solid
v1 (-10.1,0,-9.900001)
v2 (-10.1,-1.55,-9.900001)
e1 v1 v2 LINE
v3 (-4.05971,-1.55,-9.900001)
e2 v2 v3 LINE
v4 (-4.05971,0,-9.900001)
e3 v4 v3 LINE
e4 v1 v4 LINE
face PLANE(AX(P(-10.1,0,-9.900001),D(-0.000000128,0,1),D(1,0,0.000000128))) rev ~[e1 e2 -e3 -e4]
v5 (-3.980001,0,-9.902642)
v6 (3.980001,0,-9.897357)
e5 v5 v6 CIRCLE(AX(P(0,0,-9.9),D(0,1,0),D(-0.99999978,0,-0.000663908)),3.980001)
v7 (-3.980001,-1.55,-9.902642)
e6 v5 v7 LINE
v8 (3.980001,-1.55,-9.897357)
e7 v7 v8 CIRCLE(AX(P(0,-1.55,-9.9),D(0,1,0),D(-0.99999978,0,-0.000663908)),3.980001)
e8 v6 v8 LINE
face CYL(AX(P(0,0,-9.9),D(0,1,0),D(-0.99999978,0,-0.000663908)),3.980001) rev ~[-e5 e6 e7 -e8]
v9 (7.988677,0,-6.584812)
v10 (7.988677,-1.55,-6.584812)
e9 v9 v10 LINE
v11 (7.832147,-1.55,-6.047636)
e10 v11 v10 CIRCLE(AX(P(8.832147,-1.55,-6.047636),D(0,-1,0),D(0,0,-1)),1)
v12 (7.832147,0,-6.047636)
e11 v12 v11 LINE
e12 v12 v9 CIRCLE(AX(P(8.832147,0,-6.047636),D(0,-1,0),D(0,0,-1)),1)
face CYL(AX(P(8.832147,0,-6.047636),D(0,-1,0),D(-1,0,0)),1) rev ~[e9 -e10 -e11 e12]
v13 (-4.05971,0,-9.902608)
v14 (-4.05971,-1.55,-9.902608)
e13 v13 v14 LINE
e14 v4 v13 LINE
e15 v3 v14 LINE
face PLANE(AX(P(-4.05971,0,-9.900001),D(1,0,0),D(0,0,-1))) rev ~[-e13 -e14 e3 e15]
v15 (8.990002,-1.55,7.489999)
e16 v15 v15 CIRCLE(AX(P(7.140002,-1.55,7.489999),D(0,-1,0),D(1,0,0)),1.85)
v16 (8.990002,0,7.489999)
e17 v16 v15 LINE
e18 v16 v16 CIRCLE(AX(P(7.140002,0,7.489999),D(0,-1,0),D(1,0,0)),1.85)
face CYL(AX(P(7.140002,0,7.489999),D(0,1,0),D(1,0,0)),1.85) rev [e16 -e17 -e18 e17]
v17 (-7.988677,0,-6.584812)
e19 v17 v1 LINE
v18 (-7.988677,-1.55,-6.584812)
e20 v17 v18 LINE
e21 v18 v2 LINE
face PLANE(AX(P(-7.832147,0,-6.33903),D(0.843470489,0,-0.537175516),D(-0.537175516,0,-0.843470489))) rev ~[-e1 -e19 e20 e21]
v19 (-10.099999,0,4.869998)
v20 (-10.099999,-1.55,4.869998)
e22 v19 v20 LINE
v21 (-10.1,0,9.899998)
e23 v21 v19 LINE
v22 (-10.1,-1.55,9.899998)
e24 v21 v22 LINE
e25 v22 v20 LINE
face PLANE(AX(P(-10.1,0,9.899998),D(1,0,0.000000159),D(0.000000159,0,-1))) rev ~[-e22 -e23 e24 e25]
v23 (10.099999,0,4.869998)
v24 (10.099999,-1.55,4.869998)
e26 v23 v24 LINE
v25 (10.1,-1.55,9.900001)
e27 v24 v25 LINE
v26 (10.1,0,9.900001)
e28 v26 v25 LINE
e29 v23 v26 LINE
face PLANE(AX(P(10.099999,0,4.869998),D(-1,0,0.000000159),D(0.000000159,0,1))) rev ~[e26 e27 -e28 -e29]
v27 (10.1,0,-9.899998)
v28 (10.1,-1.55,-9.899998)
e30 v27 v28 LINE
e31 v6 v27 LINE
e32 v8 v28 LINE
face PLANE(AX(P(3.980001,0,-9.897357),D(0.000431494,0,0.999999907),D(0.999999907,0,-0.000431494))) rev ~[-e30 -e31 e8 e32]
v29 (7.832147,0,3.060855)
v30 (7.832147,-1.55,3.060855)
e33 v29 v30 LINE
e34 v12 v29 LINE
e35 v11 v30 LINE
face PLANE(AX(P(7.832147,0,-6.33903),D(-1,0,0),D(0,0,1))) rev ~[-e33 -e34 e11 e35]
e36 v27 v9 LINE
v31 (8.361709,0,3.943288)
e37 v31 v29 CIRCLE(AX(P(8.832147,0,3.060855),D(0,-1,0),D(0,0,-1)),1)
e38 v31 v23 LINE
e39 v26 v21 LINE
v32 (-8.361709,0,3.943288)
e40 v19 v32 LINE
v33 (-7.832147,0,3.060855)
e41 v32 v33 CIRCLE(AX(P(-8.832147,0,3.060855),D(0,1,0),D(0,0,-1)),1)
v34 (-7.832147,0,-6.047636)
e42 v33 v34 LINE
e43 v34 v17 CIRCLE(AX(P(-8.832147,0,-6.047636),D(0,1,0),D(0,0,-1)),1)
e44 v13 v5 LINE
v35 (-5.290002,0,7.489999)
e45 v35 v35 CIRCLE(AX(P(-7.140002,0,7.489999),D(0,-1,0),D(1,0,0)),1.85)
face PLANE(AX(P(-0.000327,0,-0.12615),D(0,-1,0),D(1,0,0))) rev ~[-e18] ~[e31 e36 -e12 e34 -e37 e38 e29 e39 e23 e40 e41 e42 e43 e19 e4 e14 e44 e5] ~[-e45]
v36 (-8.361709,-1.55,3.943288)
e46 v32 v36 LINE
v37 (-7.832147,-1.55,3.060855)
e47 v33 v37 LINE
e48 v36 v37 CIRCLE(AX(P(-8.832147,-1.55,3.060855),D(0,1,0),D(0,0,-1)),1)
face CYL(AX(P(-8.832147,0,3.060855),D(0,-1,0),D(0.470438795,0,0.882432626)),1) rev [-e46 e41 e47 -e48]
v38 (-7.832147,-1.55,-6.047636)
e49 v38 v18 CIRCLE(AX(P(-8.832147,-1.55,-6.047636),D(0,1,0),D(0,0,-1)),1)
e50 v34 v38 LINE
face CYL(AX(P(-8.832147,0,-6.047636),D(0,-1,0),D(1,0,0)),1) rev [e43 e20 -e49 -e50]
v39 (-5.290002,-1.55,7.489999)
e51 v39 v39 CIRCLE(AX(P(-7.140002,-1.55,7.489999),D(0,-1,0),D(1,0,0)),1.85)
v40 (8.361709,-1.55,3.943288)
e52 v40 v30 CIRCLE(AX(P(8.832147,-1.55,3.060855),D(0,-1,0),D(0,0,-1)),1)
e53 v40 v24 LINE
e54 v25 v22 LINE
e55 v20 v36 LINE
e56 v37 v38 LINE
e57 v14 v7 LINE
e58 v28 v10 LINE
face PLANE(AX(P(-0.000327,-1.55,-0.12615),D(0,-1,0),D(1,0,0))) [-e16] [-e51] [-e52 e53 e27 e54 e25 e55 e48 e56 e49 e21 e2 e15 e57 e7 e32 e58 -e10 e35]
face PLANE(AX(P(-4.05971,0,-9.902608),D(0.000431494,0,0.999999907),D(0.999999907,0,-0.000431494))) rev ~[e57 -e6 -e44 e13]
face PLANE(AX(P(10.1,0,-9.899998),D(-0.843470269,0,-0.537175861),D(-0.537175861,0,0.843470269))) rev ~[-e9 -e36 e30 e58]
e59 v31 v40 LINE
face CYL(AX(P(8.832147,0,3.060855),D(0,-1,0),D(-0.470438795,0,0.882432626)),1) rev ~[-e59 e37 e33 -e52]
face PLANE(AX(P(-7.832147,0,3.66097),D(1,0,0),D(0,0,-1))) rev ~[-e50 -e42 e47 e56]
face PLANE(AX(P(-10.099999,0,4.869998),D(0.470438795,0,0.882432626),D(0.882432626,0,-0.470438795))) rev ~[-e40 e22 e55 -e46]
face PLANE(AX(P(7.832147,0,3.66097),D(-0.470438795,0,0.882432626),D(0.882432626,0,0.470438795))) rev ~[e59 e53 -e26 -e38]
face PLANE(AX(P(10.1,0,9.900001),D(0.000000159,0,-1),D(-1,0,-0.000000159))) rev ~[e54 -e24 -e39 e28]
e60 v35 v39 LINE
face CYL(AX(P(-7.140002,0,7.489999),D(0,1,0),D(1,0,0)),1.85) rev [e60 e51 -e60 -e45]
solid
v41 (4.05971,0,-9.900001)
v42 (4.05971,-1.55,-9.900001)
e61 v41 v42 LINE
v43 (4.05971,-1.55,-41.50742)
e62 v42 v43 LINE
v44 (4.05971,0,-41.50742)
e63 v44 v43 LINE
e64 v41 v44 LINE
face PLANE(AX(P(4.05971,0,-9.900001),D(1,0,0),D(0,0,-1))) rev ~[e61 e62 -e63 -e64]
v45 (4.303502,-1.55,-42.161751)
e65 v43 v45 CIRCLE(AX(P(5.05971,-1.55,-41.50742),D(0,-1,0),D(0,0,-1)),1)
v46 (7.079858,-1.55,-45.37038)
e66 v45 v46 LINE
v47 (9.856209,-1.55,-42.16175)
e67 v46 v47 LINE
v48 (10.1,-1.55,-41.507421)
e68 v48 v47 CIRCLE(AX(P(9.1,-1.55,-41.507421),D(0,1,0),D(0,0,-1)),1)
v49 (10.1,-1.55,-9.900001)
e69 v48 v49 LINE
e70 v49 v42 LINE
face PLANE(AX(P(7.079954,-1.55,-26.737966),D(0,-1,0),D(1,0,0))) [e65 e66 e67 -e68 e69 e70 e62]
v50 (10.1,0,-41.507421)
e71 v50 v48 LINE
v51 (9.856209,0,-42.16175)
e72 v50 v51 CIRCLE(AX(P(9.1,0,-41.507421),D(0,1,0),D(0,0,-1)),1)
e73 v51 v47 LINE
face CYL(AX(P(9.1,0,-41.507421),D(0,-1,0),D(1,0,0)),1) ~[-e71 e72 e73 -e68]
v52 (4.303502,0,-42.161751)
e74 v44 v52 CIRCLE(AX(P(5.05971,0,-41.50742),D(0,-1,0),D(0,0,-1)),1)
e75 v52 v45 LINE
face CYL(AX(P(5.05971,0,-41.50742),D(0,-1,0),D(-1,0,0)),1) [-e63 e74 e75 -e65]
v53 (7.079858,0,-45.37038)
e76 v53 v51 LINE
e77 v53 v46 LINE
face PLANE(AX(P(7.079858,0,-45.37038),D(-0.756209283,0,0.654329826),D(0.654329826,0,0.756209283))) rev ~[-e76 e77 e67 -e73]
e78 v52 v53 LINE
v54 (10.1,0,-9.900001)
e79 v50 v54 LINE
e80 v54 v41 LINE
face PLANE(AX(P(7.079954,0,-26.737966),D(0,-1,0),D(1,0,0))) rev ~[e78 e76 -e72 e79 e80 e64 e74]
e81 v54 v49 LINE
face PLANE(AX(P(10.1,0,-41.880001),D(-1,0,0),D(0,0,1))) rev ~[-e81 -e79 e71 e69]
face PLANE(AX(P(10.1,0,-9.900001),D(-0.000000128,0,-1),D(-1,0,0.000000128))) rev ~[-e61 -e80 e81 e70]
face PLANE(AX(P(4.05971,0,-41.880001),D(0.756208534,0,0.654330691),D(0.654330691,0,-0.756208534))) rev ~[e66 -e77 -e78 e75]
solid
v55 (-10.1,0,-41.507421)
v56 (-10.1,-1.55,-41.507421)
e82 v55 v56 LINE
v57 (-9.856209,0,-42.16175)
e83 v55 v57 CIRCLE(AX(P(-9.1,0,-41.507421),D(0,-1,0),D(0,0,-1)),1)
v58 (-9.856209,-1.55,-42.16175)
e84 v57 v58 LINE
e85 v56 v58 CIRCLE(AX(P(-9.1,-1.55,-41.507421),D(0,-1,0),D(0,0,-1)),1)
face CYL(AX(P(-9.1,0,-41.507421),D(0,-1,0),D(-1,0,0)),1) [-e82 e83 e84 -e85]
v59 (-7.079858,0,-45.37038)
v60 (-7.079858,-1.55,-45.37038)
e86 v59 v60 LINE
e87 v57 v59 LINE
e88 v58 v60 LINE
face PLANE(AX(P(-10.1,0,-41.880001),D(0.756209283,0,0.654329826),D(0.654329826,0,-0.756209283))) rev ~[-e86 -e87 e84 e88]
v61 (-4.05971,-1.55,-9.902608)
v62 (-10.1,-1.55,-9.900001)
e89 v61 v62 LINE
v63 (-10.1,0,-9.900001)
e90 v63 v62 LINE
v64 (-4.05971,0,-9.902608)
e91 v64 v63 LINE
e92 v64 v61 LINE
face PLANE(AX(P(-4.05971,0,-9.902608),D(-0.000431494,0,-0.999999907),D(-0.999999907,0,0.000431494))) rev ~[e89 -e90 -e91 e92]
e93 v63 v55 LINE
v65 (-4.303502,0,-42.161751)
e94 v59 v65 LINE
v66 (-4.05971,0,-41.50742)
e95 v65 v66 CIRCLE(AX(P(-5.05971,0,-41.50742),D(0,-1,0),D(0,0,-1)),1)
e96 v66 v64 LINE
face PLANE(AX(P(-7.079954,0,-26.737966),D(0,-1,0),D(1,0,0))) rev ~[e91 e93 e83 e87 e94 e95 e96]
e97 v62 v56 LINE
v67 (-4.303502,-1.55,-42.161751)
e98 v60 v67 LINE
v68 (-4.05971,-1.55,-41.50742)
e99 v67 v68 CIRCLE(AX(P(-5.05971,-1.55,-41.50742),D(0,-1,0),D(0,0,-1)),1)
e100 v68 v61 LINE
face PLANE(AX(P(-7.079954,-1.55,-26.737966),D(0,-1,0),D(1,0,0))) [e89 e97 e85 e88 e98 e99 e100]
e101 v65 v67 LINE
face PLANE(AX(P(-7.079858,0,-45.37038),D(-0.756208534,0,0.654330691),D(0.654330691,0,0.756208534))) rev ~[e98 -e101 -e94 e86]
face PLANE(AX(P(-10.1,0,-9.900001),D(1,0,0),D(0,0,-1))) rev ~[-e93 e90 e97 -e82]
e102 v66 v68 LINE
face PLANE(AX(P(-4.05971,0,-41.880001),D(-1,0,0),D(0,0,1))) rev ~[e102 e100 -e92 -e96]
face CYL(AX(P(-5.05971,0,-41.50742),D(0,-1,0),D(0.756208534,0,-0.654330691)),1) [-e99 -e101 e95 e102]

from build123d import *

# Parameters (mm, degrees)
F1_DEPTH = 1.55
F0_R     = 1.85
F2_R     = 1
F2_2_R   = 1
F2_3_R   = 1


# Not quite as in the source:
# - ends of sketch curves that miss each other by under 0.0002 mm in the source are joined


with BuildPart() as f1:
    # F0 (on Front) → F1 (new body)
    with BuildSketch(Plane.XZ):
        Polygon((-4.0597100742, -9.902607639), (-10.1, -9.9000012899), (-10.1, -41.8800012899), (-7.0798584417, -45.3703802887), (-4.0597100742, -41.8800014933), align=None)
    extrude(amount=F1_DEPTH)

    # F2#2
    f2_2_edges = [f1.edges().sort_by_distance(p)[0] for p in [
        (-10.1, -0.775, -41.880001),
        (-4.05971, -0.775, -41.880001),
    ]]
    fillet(f2_2_edges, radius=F2_2_R)


with BuildPart() as f1b:
    # F0 (on Front) → F1, piece 2 (new body)
    with BuildSketch(Plane.XZ):
        Polygon((10.1, -41.8800012899), (10.1, -9.9000012899), (4.0597100742, -9.902607639), (4.0597100742, -41.8800014933), (7.0798584417, -45.3703802887), align=None)
        Polygon((4.0597100742, -9.902607639), (10.1, -9.9000012899), (4.0597100742, -9.9000005185), align=None)
    extrude(amount=F1_DEPTH)

    # F2#3
    f2_3_edges = [f1b.edges().sort_by_distance(p)[0] for p in [
        (4.05971, -0.775, -41.880001),
        (10.1, -0.775, -41.880001),
    ]]
    fillet(f2_3_edges, radius=F2_3_R)


with BuildPart() as f1c:
    # F0 (on Front) → F1, piece 3 (new body)
    with BuildSketch(Plane.XZ):
        with BuildLine():
            Line((10.1, 9.9000012899), (-10.1, 9.899998069))
            Line((-10.1, 9.899998069), (-10.099999198, 4.869998069))
            Line((-10.099999198, 4.869998069), (-7.8321473486, 3.6609703649))
            Line((-7.8321473486, 3.6609703649), (-7.8321473486, -6.3390296351))
            Line((-7.8321473486, -6.3390296351), (-10.1, -9.9000012899))
            Line((-10.1, -9.9000012899), (-4.0597100742, -9.9000005185))
            Line((-4.0597100742, -9.9000005185), (-4.0597100742, -9.902607639))
            Line((-4.0597100742, -9.902607639), (-3.9800005697, -9.9026420332))
            ThreePointArc((-3.9800005697, -9.9026420332), (-0.0026423538, -5.9199991097), (3.9800005697, -9.8973573257))
            Line((3.9800005697, -9.8973573257), (10.1, -9.899998069))
            Line((10.1, -9.899998069), (7.8321473486, -6.3390296351))
            Line((7.8321473486, -6.3390296351), (7.8321473486, 3.6609703649))
            Line((7.8321473486, 3.6609703649), (10.099999198, 4.869998069))
            Line((10.099999198, 4.869998069), (10.1, 9.9000012899))
        make_face()
        with Locations((-7.1400015305, 7.489998541)):
            Circle(F0_R, mode=Mode.SUBTRACT)
        with Locations((7.1400015305, 7.489998541)):
            Circle(F0_R, mode=Mode.SUBTRACT)
    extrude(amount=F1_DEPTH)

    # F2
    f2_edges = [f1c.edges().sort_by_distance(p)[0] for p in [
        (7.832147, -0.775, 3.66097),
        (7.832147, -0.775, -6.33903),
        (-7.832147, -0.775, 3.66097),
        (-7.832147, -0.775, -6.33903),
    ]]
    fillet(f2_edges, radius=F2_R)


solid = Compound([f1.part, f1b.part, f1c.part])
